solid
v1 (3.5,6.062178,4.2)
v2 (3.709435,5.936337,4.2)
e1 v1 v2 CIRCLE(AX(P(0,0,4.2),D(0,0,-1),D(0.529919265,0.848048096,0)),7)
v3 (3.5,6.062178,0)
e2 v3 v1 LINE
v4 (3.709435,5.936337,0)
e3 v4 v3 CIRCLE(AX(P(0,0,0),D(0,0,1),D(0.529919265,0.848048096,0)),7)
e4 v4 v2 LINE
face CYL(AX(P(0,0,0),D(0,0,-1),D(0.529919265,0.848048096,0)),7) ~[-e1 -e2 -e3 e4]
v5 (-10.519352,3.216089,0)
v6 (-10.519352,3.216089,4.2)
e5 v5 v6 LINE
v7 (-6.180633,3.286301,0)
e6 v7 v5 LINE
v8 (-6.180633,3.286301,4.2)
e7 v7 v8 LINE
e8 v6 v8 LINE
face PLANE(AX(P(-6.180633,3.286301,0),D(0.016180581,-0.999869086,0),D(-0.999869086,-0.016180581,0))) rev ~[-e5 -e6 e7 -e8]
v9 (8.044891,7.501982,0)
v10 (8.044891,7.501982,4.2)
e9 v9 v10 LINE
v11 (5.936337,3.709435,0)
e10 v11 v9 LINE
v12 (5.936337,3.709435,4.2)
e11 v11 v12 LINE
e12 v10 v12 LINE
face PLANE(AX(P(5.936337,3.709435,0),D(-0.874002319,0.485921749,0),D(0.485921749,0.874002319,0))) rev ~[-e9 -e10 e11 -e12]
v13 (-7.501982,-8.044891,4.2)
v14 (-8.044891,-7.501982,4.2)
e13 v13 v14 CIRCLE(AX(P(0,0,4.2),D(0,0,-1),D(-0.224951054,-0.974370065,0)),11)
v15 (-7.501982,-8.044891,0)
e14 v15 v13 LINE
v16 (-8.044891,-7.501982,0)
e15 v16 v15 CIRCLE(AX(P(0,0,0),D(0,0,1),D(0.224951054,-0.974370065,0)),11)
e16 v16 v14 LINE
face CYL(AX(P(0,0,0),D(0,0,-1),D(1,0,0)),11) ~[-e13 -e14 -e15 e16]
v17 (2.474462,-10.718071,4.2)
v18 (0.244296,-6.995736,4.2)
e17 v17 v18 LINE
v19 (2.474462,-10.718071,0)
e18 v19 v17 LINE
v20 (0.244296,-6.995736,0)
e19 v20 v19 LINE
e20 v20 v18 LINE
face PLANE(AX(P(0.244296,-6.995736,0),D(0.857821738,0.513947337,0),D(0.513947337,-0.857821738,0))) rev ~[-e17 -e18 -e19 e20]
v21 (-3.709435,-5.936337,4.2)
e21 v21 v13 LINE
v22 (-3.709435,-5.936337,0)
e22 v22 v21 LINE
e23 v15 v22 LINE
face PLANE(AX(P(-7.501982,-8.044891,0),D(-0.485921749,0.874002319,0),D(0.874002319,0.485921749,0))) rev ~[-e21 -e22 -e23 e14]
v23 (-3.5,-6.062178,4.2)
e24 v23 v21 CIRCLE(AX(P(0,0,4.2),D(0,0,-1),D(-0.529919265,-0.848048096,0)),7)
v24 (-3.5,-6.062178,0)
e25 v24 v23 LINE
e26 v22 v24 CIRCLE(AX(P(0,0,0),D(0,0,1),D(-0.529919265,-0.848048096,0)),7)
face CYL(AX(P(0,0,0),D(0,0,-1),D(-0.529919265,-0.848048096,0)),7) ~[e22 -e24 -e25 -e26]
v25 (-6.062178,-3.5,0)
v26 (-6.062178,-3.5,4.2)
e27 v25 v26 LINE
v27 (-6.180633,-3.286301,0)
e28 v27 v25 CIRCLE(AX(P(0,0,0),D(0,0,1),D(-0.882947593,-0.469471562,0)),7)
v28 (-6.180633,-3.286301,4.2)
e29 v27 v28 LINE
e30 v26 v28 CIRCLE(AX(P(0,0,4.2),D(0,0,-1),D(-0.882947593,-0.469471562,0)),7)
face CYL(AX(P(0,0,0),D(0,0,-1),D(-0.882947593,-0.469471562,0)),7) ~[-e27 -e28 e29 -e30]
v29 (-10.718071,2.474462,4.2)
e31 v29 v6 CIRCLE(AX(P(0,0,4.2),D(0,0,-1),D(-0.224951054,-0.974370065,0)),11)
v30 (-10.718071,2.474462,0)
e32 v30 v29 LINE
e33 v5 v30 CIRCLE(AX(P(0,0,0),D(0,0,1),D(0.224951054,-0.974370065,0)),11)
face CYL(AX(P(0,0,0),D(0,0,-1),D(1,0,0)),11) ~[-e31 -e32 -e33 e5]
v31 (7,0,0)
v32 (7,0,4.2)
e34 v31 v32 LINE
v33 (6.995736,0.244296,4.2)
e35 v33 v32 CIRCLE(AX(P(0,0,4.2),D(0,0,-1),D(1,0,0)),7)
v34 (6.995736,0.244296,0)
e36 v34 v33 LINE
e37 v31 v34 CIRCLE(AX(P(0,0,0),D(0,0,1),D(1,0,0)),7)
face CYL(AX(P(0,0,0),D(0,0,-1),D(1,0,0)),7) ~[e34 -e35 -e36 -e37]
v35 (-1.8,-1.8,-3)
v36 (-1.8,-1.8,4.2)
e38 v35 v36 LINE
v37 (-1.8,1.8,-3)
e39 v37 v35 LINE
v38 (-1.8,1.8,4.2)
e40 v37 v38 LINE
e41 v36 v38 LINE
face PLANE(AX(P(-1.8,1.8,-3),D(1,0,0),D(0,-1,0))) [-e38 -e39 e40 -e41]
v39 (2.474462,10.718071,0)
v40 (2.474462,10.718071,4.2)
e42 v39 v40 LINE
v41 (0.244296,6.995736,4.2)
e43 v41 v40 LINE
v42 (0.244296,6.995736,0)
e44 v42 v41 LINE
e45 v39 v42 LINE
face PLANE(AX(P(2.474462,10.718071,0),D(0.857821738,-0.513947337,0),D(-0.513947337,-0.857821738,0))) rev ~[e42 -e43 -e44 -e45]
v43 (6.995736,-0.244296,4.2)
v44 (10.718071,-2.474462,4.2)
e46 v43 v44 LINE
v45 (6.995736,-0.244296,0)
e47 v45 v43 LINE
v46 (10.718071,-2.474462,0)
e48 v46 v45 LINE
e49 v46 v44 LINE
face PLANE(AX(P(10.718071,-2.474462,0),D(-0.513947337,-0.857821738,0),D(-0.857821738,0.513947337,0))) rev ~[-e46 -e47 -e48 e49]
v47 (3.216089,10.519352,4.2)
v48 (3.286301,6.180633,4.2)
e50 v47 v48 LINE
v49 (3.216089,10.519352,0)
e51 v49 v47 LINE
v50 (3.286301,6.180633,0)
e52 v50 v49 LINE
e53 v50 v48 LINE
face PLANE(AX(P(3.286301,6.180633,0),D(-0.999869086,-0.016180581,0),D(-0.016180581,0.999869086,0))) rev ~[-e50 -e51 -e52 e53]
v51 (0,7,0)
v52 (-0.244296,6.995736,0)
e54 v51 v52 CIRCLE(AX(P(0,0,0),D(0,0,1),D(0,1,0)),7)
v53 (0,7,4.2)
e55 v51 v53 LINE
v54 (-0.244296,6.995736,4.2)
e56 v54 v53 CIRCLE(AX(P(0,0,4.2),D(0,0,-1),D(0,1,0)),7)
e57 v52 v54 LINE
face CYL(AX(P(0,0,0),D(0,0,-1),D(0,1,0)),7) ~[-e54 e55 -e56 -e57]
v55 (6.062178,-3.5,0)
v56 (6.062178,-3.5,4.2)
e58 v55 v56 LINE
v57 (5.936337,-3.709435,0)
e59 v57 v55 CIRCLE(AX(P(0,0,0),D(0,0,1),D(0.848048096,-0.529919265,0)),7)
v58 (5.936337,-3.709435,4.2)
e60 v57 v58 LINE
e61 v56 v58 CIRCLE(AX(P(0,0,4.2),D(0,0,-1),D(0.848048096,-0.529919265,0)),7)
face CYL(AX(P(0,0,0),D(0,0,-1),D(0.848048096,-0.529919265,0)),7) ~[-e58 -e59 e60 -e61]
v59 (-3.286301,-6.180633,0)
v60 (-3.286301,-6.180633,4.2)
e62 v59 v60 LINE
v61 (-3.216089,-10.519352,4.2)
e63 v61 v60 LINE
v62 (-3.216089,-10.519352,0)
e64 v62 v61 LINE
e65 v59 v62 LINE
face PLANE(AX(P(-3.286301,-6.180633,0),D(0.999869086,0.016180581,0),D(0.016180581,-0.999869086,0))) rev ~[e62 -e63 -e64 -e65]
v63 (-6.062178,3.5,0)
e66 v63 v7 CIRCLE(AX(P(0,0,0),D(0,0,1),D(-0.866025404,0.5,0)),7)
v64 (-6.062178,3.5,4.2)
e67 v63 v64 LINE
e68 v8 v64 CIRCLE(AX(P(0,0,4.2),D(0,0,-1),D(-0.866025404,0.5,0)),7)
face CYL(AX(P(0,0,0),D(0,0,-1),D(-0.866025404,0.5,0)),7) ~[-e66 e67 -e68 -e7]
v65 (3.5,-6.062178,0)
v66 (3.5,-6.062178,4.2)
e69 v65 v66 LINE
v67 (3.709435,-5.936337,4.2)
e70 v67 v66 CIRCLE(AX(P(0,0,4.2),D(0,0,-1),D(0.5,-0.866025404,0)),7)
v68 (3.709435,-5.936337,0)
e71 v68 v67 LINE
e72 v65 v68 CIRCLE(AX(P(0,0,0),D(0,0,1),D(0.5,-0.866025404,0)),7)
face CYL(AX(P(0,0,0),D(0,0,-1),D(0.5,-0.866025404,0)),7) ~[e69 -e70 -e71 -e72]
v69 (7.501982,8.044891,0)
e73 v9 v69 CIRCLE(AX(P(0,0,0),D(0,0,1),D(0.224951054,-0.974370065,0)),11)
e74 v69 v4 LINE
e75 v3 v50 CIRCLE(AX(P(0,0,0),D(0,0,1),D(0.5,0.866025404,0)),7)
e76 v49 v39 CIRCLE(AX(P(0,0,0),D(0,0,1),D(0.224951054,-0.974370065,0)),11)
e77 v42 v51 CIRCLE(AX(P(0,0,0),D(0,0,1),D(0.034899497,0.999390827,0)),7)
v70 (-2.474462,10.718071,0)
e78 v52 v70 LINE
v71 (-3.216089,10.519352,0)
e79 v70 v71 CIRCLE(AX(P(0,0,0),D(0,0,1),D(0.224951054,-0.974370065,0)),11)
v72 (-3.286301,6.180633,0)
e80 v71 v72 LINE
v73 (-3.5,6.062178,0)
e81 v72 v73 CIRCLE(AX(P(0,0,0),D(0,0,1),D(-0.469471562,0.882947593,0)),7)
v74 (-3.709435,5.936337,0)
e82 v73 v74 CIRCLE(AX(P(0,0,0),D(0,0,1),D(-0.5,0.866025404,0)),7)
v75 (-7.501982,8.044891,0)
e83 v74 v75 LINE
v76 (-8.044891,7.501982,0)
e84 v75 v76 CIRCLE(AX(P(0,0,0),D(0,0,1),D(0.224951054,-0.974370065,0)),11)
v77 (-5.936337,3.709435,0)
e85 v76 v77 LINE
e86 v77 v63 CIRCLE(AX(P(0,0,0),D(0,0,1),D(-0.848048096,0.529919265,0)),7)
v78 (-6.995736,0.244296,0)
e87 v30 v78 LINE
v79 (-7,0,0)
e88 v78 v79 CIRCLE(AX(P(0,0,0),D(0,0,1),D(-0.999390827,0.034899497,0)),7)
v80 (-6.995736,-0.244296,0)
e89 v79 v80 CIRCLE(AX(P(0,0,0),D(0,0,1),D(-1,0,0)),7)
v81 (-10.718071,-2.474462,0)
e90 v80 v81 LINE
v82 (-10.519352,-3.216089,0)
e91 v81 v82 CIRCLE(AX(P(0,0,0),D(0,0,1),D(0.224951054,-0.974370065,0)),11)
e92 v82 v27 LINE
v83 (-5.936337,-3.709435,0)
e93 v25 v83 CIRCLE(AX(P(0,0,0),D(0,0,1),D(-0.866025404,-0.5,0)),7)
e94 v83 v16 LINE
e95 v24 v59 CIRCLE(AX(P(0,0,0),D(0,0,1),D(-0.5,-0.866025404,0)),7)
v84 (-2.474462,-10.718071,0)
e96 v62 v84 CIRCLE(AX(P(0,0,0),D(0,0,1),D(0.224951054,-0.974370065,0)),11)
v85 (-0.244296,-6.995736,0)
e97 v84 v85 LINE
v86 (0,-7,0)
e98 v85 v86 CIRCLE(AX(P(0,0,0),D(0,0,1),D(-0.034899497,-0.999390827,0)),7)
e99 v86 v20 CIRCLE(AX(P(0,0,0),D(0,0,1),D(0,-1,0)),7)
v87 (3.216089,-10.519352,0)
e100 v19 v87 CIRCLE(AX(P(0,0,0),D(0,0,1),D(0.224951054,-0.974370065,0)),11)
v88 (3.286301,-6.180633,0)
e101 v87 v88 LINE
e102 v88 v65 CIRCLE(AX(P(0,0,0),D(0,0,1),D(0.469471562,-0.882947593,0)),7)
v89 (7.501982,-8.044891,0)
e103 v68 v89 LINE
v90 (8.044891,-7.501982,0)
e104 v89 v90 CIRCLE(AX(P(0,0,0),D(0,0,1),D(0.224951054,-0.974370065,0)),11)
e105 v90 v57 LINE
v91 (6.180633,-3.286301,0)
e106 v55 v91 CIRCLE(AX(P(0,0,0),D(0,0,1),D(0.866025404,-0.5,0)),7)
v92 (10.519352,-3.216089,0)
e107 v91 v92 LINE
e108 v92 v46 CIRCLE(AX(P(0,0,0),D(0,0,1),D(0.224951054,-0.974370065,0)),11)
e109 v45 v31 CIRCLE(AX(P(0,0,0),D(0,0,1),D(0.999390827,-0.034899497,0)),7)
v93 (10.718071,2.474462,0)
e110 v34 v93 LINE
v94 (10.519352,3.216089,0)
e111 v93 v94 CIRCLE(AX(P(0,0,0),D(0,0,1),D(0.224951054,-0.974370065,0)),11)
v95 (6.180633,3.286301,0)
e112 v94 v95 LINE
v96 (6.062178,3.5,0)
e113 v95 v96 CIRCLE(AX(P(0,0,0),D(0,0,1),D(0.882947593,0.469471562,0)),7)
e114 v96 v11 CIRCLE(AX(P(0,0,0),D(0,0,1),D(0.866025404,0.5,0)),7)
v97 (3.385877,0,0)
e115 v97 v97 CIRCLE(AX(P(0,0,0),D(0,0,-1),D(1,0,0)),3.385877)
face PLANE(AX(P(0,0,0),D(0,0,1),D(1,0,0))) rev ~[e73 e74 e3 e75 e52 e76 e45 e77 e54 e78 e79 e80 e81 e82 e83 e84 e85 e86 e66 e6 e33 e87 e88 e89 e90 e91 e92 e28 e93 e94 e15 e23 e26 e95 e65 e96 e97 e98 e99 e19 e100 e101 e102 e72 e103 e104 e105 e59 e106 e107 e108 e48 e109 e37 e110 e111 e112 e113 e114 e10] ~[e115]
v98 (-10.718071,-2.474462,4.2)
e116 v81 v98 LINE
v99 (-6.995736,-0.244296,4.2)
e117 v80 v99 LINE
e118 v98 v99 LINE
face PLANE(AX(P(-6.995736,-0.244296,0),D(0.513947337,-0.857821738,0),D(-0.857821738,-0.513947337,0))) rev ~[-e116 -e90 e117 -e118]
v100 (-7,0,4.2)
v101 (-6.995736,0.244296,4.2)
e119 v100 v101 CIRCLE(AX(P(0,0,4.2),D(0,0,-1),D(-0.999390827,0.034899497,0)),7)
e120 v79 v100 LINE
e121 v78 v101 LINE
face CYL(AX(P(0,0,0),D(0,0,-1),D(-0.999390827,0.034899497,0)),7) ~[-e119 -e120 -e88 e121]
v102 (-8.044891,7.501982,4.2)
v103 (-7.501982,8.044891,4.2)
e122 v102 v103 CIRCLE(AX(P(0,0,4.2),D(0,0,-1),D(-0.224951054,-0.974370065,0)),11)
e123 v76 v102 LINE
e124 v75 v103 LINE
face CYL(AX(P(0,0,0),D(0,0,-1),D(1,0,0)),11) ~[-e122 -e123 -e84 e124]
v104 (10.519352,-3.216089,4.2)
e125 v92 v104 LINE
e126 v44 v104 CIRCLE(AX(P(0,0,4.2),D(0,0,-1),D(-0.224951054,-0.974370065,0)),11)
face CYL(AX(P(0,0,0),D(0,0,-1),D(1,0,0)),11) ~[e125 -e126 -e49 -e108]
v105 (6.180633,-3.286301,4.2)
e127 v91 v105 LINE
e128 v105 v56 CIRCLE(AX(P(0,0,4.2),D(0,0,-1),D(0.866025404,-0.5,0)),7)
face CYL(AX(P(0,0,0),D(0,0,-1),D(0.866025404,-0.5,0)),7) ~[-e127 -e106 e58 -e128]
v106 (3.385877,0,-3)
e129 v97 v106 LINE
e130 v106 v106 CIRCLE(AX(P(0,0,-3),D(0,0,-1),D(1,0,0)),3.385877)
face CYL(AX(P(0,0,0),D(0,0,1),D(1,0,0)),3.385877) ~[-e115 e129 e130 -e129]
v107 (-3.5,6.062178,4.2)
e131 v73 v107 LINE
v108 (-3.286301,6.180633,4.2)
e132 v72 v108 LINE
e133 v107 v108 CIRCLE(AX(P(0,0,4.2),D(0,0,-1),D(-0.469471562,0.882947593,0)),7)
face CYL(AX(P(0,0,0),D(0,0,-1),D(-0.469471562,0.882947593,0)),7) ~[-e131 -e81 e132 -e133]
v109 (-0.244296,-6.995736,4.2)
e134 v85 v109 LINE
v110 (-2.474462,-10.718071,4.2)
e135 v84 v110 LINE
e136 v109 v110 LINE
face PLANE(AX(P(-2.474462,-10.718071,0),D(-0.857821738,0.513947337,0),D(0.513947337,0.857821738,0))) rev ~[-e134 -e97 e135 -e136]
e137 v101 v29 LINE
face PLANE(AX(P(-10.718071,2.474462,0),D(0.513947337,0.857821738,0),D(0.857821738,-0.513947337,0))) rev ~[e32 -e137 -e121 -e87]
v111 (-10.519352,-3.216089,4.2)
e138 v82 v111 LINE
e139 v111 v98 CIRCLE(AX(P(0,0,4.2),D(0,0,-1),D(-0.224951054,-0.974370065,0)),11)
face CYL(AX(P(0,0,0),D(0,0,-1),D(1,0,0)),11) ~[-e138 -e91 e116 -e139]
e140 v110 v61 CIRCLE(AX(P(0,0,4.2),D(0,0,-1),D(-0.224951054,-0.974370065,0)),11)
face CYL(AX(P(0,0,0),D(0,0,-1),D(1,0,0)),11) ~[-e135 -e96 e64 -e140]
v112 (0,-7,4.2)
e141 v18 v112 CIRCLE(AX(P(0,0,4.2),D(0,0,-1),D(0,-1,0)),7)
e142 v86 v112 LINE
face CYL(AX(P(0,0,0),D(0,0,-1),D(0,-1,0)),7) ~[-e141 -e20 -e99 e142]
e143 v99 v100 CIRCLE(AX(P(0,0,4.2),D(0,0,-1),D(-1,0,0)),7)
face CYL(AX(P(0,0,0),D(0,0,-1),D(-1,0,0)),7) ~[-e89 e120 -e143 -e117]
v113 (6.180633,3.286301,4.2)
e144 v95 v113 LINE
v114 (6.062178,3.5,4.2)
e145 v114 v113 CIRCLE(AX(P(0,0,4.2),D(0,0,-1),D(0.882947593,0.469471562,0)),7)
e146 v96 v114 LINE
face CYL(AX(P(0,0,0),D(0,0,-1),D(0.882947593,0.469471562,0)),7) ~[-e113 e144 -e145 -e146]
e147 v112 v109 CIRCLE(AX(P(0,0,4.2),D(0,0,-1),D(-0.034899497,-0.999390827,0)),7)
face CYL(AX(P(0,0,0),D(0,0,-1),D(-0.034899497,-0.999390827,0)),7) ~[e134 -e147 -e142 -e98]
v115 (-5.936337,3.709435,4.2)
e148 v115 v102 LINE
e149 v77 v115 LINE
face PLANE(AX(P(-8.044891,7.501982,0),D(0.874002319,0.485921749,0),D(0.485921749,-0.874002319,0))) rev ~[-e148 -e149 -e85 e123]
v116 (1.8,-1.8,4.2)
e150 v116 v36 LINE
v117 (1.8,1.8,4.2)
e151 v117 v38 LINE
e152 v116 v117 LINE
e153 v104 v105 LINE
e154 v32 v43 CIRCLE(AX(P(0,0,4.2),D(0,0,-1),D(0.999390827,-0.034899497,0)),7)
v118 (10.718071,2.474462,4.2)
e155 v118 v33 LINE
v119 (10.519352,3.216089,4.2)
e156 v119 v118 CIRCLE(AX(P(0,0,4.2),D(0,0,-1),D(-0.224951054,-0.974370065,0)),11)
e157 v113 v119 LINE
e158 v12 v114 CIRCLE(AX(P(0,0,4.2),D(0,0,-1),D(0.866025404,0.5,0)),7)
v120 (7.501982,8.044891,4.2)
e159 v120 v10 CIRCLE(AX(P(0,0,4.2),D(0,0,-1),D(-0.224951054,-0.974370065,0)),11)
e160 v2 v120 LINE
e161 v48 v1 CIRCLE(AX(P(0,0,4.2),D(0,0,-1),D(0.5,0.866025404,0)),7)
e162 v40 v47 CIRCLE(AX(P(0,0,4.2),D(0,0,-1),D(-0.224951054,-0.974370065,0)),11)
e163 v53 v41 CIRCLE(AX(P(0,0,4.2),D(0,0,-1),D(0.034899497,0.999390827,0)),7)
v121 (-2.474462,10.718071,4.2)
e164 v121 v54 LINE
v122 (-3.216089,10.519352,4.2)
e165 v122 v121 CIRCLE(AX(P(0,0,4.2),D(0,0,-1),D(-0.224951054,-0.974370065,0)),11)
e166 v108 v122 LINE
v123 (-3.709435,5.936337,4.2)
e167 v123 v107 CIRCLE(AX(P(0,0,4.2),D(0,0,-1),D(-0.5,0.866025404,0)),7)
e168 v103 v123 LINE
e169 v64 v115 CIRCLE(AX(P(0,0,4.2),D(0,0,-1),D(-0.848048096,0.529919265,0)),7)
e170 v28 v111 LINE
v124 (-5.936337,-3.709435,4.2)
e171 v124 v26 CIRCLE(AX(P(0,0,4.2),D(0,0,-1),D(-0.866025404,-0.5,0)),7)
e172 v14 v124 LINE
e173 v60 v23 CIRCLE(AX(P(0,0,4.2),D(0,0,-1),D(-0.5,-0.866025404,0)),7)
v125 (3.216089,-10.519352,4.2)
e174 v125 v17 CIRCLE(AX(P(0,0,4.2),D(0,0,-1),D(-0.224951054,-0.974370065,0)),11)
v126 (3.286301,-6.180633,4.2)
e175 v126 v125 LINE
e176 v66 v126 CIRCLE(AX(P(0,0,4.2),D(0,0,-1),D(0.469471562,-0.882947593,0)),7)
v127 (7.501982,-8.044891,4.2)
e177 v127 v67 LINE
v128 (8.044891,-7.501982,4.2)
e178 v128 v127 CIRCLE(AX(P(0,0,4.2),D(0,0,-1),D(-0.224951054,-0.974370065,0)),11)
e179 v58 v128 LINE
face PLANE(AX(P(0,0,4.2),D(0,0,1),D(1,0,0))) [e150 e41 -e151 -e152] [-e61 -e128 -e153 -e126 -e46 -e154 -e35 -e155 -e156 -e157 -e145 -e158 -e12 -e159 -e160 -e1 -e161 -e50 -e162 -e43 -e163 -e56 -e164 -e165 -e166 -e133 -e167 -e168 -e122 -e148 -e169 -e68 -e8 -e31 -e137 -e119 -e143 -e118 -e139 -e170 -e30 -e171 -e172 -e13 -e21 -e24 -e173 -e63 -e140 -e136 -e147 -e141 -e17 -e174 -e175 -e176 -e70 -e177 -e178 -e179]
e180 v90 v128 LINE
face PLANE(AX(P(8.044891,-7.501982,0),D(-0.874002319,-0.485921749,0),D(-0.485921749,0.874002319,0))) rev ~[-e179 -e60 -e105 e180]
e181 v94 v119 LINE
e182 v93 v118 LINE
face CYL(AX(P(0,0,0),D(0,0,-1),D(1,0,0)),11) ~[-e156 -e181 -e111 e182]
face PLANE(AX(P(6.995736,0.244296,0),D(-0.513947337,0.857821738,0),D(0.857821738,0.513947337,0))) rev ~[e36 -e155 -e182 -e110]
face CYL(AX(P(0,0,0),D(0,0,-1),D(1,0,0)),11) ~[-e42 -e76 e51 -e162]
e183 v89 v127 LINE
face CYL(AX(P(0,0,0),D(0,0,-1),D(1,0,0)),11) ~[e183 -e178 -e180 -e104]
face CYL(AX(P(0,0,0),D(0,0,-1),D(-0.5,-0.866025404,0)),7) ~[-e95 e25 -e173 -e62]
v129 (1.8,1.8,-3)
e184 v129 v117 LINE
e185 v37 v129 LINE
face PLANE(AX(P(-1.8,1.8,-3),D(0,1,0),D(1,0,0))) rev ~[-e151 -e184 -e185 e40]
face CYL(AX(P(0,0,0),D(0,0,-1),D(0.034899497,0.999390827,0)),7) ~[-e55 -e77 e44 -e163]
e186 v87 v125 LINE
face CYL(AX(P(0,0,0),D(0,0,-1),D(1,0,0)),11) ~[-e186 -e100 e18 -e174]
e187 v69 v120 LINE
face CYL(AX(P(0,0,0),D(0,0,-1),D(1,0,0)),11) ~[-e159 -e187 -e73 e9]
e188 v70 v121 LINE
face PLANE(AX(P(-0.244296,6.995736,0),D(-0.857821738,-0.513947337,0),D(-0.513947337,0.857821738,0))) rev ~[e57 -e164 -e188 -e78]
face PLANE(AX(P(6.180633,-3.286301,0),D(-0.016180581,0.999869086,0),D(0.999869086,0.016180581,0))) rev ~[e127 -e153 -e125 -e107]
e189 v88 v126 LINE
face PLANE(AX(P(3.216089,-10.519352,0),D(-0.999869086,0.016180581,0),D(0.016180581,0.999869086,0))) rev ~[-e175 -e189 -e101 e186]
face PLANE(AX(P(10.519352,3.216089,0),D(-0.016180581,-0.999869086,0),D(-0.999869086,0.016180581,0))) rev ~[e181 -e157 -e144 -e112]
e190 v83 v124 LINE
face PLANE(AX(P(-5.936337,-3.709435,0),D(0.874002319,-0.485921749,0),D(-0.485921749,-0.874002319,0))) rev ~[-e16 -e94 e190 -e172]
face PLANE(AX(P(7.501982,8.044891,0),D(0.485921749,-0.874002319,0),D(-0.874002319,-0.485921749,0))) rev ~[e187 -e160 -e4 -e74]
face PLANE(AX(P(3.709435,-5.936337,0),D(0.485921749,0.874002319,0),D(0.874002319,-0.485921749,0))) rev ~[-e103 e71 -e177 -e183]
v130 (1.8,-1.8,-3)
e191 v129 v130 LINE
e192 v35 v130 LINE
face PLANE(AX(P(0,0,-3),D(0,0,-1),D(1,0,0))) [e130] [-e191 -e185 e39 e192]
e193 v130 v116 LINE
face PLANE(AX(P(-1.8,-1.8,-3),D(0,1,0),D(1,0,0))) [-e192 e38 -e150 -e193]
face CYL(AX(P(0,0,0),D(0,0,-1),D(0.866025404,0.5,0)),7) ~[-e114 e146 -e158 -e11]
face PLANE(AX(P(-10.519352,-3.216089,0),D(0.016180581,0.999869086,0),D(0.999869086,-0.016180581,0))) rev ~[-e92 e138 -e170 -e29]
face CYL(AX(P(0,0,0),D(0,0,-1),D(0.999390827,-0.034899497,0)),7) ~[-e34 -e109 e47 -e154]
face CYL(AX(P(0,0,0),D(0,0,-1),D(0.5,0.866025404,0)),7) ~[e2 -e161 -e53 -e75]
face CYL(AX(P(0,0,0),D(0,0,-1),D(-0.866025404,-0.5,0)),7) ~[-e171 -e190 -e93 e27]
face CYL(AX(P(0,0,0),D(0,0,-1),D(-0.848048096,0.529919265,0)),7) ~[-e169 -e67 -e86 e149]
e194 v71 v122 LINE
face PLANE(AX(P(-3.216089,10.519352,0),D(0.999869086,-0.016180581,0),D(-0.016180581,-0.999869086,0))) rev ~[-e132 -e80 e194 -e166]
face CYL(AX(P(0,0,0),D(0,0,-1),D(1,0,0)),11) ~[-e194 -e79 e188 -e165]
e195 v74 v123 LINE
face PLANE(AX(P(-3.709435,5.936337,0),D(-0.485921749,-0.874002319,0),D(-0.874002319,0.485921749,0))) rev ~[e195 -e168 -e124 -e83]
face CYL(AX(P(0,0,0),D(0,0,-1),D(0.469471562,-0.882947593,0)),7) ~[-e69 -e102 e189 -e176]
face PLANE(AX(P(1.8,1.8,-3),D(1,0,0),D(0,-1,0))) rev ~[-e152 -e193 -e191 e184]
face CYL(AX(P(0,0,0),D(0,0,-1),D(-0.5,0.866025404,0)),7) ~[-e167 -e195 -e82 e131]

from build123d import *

# Parameters (mm, degrees)
F0_R            = 11
F1_DEPTH        = 4.2
F3_DEPTH        = 4.201
F3_COPIES_COUNT = 12
F5_R            = 3.3858769499
F6_DEPTH        = 3
F7_W            = 3.6
F7_H            = 3.6
F8_DEPTH        = 7.201


# Not quite as in the source:
# - a pattern or mirror of a feature is missing from the dataset's text; its kind, count and spacing are read off the source's solid


with BuildPart() as f1:
    # F0 (on Top) → F1 (new body)
    with BuildSketch(Plane.XY):
        Circle(F0_R)
    extrude(amount=F1_DEPTH)

    # F2 (on face) → F3 (cut, through all)
    with BuildSketch(Plane(origin=(0, 0, 0), x_dir=(1, 0, 0), z_dir=(0, 0, -1))):
        with BuildLine():
            ThreePointArc((-0.2442964769, 6.9957357891), (-0.1221668451, 6.9989338661), (0, 7))
            Line((0, 7), (0, 11))
            ThreePointArc((0, 11), (-1.2452353514, 10.9292904124), (-2.4744615978, 10.7180707126))
            Line((-2.4744615978, 10.7180707126), (-0.2442964769, 6.9957357891))
        make_face()
        with BuildLine():
            Line((0, 11), (0, 7))
            ThreePointArc((0, 7), (0.1221668451, 6.9989338661), (0.2442964769, 6.9957357891))
            Line((0.2442964769, 6.9957357891), (2.4744615978, 10.7180707126))
            ThreePointArc((2.4744615978, 10.7180707126), (1.2452353514, 10.9292904124), (0, 11))
        make_face()
    f3 = extrude(amount=-F3_DEPTH, mode=Mode.SUBTRACT)

    # F3_copies: F3 ×12 about axis
    f3_copies_axis = Axis((0, 0, 0), (0, 0, 1))
    for i in range(1, F3_COPIES_COUNT):
        add(f3.rotate(f3_copies_axis, i * 360 / F3_COPIES_COUNT), mode=Mode.SUBTRACT)

    # F5 (on face) → F6 (join)
    with BuildSketch(Plane(origin=(0, 0, 0), x_dir=(1, 0, 0), z_dir=(0, 0, -1))):
        Circle(F5_R)
    extrude(amount=F6_DEPTH)

    # F7 (on face) → F8 (cut, through all)
    with BuildSketch(Plane(origin=(0, 0, -3), x_dir=(1, 0, 0), z_dir=(0, 0, -1))):
        Rectangle(F7_W, F7_H)
    extrude(amount=-F8_DEPTH, mode=Mode.SUBTRACT)


solid = f1.part
